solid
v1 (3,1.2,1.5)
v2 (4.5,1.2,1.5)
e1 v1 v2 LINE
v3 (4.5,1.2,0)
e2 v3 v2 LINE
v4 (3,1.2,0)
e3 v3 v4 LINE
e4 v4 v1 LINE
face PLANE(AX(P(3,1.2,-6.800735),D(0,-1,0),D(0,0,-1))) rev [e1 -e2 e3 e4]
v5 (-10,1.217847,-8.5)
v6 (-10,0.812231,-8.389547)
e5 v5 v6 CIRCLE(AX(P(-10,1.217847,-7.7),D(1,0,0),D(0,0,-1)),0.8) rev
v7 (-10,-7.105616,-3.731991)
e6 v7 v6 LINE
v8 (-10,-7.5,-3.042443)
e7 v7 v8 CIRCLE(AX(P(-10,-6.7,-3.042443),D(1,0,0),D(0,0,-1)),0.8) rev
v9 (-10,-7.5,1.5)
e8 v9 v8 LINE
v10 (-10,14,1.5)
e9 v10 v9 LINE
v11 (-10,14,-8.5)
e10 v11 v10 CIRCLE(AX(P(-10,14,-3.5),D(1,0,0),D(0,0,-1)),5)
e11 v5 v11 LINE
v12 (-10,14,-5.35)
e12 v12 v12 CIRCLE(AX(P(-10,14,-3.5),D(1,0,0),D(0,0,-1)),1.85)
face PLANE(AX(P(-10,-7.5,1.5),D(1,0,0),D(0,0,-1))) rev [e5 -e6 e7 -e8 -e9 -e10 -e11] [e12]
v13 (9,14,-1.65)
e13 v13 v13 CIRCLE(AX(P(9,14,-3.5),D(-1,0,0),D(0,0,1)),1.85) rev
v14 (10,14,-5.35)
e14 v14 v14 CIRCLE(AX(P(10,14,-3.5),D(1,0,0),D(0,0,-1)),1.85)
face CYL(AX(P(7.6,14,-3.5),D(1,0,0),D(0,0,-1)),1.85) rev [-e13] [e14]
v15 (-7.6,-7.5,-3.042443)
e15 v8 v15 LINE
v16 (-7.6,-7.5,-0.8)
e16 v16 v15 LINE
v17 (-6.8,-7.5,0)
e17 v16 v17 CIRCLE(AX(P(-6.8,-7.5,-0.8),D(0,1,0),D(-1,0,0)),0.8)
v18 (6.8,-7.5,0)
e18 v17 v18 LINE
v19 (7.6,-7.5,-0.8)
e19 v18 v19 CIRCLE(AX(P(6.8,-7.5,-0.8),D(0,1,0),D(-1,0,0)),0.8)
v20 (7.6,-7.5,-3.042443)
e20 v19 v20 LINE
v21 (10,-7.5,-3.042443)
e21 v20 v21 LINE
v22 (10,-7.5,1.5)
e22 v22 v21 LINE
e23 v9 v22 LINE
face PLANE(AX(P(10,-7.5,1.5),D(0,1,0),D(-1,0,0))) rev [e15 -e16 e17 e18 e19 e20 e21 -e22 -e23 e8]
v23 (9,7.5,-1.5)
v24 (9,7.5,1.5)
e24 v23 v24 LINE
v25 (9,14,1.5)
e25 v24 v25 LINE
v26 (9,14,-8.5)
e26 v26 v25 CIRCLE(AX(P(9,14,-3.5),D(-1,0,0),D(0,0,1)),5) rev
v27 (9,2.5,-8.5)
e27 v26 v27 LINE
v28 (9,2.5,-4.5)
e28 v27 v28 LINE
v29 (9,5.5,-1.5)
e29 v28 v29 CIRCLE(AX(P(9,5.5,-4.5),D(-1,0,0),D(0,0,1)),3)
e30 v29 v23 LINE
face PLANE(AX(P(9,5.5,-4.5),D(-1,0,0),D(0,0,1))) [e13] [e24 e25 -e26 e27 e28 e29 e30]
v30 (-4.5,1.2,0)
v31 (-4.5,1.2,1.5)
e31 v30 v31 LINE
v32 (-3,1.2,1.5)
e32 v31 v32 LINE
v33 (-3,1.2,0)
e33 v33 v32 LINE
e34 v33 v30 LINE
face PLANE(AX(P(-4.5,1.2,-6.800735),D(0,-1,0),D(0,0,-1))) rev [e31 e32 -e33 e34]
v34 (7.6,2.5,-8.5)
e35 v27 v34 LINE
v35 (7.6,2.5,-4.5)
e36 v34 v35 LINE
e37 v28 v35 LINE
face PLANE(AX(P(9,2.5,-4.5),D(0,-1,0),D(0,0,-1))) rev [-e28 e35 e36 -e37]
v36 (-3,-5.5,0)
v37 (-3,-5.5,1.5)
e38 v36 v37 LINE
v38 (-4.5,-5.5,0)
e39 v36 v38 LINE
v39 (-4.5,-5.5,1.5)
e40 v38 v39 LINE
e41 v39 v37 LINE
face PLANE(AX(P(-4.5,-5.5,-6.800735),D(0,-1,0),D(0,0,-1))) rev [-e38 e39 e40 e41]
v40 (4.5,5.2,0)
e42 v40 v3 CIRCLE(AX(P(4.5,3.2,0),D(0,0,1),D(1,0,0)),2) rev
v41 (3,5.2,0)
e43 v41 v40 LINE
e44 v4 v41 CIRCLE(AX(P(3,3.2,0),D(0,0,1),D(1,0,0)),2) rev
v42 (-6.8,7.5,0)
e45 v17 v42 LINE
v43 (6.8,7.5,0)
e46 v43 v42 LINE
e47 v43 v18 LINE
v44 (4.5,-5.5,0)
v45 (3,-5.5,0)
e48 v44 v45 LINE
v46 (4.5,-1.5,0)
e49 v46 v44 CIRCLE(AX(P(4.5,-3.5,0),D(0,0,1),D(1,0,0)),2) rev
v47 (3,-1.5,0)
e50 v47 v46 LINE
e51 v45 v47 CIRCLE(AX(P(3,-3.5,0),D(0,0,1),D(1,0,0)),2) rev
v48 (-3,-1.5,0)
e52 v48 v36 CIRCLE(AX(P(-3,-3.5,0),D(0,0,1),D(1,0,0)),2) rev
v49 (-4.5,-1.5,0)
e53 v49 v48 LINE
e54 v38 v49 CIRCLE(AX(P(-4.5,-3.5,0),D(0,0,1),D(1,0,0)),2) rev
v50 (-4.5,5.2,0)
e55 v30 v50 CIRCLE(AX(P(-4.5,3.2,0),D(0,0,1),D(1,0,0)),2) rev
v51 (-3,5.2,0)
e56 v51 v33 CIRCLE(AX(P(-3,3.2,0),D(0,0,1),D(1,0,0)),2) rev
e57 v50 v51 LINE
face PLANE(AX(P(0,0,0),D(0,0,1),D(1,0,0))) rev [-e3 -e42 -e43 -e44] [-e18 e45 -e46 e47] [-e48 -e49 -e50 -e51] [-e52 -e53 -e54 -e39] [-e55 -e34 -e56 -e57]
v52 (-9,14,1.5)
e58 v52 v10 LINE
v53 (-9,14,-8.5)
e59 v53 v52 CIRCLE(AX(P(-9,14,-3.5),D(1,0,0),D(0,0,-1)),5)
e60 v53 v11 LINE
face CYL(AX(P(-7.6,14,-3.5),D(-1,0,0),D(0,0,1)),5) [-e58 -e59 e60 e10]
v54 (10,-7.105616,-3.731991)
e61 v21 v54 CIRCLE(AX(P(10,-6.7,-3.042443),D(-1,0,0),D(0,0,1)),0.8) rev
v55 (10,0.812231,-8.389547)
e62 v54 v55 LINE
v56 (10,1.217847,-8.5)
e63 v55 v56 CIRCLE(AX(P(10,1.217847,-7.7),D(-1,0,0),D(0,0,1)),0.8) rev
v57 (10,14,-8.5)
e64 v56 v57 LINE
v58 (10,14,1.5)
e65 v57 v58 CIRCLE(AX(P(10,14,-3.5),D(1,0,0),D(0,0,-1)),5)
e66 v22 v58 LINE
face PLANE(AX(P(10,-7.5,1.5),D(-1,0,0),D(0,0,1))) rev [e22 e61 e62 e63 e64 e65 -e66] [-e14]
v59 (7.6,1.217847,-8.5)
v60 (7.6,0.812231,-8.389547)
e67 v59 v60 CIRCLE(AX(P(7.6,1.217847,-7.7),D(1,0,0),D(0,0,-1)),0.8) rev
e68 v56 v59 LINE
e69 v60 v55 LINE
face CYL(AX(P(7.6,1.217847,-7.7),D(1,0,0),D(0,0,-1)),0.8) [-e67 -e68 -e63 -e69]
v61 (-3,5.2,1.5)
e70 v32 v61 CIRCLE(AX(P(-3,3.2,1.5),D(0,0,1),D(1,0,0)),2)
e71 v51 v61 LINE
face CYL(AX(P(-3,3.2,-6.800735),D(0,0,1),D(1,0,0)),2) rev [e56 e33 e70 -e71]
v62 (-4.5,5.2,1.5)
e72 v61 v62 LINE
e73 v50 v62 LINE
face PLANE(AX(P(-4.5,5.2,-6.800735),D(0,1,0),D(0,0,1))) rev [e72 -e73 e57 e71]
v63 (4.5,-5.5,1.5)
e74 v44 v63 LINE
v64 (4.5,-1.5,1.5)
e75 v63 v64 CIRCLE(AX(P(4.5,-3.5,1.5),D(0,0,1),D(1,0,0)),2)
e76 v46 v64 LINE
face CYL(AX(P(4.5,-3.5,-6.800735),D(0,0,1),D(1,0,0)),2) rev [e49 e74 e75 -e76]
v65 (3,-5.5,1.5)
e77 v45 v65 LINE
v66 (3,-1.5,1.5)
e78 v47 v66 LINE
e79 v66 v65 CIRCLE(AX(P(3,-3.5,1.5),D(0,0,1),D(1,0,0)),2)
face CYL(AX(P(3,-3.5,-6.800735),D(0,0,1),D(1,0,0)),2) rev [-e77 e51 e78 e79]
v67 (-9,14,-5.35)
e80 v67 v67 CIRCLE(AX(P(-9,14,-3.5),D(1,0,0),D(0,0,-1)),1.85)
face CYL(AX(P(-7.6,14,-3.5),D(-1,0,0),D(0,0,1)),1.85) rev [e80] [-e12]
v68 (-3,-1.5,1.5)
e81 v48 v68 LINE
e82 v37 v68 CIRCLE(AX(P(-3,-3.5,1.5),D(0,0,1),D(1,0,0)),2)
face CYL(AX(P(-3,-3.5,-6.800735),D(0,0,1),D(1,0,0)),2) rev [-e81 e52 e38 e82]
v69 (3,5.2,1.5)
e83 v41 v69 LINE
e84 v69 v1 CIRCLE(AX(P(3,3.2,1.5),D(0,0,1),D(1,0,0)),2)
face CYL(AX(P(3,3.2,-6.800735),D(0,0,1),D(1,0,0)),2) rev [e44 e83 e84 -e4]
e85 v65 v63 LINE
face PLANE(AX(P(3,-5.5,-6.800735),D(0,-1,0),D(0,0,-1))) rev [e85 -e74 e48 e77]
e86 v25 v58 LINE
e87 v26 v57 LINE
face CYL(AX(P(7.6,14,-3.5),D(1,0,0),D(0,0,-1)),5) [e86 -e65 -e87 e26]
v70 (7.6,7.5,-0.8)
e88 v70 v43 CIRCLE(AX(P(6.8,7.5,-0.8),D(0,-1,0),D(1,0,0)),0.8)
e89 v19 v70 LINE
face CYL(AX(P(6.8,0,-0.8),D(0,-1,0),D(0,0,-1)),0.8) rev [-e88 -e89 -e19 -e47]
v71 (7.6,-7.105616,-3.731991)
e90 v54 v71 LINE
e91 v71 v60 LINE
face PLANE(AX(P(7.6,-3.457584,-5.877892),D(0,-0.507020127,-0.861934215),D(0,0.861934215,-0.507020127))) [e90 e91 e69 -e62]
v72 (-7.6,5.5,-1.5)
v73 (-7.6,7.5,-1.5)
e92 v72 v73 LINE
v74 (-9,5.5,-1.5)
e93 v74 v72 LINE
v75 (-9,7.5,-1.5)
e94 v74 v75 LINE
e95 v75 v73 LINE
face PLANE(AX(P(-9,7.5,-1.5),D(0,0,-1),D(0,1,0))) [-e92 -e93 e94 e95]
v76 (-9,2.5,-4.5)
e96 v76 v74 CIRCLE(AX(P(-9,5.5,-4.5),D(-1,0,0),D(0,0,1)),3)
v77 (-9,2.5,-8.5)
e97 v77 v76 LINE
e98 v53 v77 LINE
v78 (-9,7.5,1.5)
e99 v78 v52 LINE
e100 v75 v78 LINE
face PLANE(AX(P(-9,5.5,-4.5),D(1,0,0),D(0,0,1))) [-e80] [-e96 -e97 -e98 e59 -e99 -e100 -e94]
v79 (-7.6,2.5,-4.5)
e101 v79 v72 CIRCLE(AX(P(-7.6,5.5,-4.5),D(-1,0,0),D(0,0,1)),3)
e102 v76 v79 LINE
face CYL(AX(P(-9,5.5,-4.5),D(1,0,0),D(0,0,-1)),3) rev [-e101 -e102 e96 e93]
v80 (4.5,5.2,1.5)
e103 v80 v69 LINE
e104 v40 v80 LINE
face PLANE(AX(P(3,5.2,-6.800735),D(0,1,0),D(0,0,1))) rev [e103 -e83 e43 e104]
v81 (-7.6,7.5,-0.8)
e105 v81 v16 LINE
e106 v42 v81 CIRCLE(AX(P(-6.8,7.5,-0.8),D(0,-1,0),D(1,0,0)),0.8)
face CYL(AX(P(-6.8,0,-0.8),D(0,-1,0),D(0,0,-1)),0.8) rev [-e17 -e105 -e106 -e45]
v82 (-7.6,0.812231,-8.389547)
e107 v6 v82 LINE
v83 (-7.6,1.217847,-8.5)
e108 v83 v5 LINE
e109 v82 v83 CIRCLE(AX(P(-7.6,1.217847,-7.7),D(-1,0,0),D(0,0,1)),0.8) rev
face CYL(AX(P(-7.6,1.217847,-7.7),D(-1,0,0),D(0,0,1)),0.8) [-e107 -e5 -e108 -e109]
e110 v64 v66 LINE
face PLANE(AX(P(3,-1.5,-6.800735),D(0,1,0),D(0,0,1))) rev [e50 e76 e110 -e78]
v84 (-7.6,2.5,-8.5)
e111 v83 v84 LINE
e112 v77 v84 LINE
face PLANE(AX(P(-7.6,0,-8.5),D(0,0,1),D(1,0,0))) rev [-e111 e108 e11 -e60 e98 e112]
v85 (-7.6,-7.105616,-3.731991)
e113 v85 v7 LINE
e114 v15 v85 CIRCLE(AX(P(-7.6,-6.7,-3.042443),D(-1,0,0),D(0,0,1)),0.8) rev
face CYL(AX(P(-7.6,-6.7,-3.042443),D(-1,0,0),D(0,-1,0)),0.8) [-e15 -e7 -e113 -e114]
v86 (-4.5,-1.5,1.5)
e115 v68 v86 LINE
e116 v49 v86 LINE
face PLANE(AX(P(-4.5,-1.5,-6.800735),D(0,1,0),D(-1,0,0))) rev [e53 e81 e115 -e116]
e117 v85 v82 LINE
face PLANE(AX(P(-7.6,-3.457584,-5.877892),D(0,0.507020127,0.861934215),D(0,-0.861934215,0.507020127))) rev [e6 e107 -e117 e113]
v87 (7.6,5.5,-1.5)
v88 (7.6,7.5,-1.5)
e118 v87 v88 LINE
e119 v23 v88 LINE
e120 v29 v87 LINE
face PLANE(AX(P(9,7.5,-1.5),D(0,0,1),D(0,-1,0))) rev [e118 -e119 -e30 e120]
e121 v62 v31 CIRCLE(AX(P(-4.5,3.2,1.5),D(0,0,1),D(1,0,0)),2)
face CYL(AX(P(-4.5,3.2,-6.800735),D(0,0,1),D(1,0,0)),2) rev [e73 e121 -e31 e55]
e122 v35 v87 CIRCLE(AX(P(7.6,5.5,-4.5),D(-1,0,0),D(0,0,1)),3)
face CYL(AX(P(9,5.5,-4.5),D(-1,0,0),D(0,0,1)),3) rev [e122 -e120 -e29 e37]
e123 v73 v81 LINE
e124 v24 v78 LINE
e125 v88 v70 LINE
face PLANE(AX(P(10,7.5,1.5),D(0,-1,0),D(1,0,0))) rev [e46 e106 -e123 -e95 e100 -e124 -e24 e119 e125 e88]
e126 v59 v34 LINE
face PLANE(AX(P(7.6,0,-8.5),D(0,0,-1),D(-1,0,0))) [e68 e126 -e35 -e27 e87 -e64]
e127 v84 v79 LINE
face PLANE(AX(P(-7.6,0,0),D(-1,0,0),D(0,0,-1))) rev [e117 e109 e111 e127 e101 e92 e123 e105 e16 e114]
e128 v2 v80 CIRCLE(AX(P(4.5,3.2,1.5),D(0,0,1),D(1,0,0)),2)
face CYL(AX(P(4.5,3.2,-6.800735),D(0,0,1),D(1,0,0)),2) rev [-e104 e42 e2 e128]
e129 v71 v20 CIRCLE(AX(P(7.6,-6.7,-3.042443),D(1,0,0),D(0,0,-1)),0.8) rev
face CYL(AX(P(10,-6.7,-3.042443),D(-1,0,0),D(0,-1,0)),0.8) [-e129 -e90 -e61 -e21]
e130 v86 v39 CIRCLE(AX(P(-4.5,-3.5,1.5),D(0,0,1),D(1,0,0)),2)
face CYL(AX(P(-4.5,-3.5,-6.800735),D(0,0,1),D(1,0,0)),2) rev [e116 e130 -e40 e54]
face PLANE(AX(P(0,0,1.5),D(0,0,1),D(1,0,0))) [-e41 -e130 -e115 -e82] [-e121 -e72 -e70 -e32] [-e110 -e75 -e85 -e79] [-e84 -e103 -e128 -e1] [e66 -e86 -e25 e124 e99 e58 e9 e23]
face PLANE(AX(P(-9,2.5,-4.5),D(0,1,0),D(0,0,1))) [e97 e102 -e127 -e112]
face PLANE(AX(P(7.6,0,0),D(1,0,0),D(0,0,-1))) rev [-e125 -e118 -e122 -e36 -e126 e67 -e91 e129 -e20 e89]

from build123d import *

# Parameters (mm, degrees)
SKETCH1_W           = 20
SKETCH1_H           = 15
BOSS_EXTRUDE1_DEPTH = 1.5
SKETCH2_R           = 1.85
BOSS_EXTRUDE2_DEPTH = 2.4
CUT_EXTRUDE1_DEPTH  = 1.4
MIRROR1_START       = -10
MIRROR1_OUTLINE_R   = 1.85
MIRROR1_DEPTH       = 1
MIRROR1_START_2     = -9
MIRROR1_2_DEPTH     = 1.4
FILLET1_R           = 0.8
CUT_EXTRUDE2_DEPTH  = 1.5


# Read off the part's stored shape, not the designer's step: Mirror1
with BuildPart() as part:
    # Sketch1 → Boss-Extrude1 (new body)
    with BuildSketch(Plane.XY):
        Rectangle(SKETCH1_W, SKETCH1_H)
    extrude(amount=BOSS_EXTRUDE1_DEPTH)

    # Sketch2 → Boss-Extrude2 (add)
    with BuildSketch(Plane(origin=(10, 0, 0), x_dir=(0, 0, -1), z_dir=(1, 0, 0))):
        with BuildLine():
            Line((0, 7.5), (0, -7.5))
            Line((0, -7.5), (3.5, -7.5))
            Line((3.5, -7.5), (8.5, 1))
            Line((8.5, 1), (8.5, 14))
            ThreePointArc((8.5, 14), (3.5, 19), (-1.5, 14))
            Line((-1.5, 14), (-1.5, 7.5))
            Line((-1.5, 7.5), (0, 7.5))
        make_face()
        with Locations((3.5, 14)):
            Circle(SKETCH2_R, mode=Mode.SUBTRACT)
    extrude(amount=-BOSS_EXTRUDE2_DEPTH)

    # Sketch3 → Cut-Extrude1 (cut)
    with BuildSketch(Plane.ZY.offset(-7.6)):
        with BuildLine():
            Line((1.5, 7.5), (-1.5, 7.5))
            Line((-1.5, 7.5), (-1.5, 5.5))
            ThreePointArc((-1.5, 5.5), (-2.378679656, 3.378679656), (-4.5, 2.5))
            Line((-4.5, 2.5), (-8.5, 2.5))
            Line((-8.5, 2.5), (-8.5, 19.043681707))
            Line((-8.5, 19.043681707), (1.5, 19.043681707))
            Line((1.5, 19.043681707), (1.5, 7.5))
        make_face()
    extrude(amount=-CUT_EXTRUDE1_DEPTH, mode=Mode.SUBTRACT)

    # Mirror1 outline → Mirror1 (add)
    with BuildSketch(Plane.YZ.offset(MIRROR1_START)):
        with BuildLine():
            ThreePointArc((14, -8.5), (19, -3.5), (14, 1.5))
            Line((14, 1.5), (7.5, 1.5))
            Line((7.5, 1.5), (7.5, 0))
            Line((7.5, 0), (-7.5, 0))
            Line((-7.5, 0), (-7.5, -3.5))
            Line((-7.5, -3.5), (1, -8.5))
            Line((1, -8.5), (14, -8.5))
        make_face()
        with Locations((14, -3.5)):
            Circle(MIRROR1_OUTLINE_R, mode=Mode.SUBTRACT)
    extrude(amount=MIRROR1_DEPTH)

    # Mirror1 2 outline → Mirror1 2 (add)
    with BuildSketch(Plane.YZ.offset(MIRROR1_START_2)):
        with BuildLine():
            Line((1, -8.5), (2.5, -8.5))
            Line((2.5, -8.5), (2.5, -4.5))
            ThreePointArc((2.5, -4.5), (3.378679656, -2.378679656), (5.5, -1.5))
            Line((5.5, -1.5), (7.5, -1.5))
            Line((7.5, -1.5), (7.5, 0))
            Line((7.5, 0), (-7.5, 0))
            Line((-7.5, 0), (-7.5, -3.5))
            Line((-7.5, -3.5), (1, -8.5))
        make_face()
    extrude(amount=MIRROR1_2_DEPTH)

    # Fillet1
    fillet1_edges = [part.edges().sort_by_distance(p)[0] for p in [
        (8.8, 1, -8.5),
        (8.8, -7.5, -3.5),
        (7.6, 0, 0),
        (-8.8, 1, -8.5),
        (-7.6, 0, 0),
        (-8.8, -7.5, -3.5),
    ]]
    fillet(fillet1_edges, radius=FILLET1_R)

    # Sketch4 → Cut-Extrude2 (cut)
    with BuildSketch(Plane.XY.offset(1.5)):
        with BuildLine():
            Line((-4.5, 5.2), (-3, 5.2))
            ThreePointArc((-3, 5.2), (-1, 3.2), (-3, 1.2))
            Line((-3, 1.2), (-4.5, 1.2))
            ThreePointArc((-4.5, 1.2), (-6.5, 3.2), (-4.5, 5.2))
        make_face()
        with BuildLine():
            Line((3, 5.2), (4.5, 5.2))
            ThreePointArc((4.5, 5.2), (6.5, 3.2), (4.5, 1.2))
            Line((4.5, 1.2), (3, 1.2))
            ThreePointArc((3, 1.2), (1, 3.2), (3, 5.2))
        make_face()
        with BuildLine():
            Line((-4.5, -1.5), (-3, -1.5))
            ThreePointArc((-3, -1.5), (-1, -3.5), (-3, -5.5))
            Line((-3, -5.5), (-4.5, -5.5))
            ThreePointArc((-4.5, -5.5), (-6.5, -3.5), (-4.5, -1.5))
        make_face()
        with BuildLine():
            Line((3, -1.5), (4.5, -1.5))
            ThreePointArc((4.5, -1.5), (6.5, -3.5), (4.5, -5.5))
            Line((4.5, -5.5), (3, -5.5))
            ThreePointArc((3, -5.5), (1, -3.5), (3, -1.5))
        make_face()
    extrude(amount=-CUT_EXTRUDE2_DEPTH, mode=Mode.SUBTRACT)


solid = part.part
